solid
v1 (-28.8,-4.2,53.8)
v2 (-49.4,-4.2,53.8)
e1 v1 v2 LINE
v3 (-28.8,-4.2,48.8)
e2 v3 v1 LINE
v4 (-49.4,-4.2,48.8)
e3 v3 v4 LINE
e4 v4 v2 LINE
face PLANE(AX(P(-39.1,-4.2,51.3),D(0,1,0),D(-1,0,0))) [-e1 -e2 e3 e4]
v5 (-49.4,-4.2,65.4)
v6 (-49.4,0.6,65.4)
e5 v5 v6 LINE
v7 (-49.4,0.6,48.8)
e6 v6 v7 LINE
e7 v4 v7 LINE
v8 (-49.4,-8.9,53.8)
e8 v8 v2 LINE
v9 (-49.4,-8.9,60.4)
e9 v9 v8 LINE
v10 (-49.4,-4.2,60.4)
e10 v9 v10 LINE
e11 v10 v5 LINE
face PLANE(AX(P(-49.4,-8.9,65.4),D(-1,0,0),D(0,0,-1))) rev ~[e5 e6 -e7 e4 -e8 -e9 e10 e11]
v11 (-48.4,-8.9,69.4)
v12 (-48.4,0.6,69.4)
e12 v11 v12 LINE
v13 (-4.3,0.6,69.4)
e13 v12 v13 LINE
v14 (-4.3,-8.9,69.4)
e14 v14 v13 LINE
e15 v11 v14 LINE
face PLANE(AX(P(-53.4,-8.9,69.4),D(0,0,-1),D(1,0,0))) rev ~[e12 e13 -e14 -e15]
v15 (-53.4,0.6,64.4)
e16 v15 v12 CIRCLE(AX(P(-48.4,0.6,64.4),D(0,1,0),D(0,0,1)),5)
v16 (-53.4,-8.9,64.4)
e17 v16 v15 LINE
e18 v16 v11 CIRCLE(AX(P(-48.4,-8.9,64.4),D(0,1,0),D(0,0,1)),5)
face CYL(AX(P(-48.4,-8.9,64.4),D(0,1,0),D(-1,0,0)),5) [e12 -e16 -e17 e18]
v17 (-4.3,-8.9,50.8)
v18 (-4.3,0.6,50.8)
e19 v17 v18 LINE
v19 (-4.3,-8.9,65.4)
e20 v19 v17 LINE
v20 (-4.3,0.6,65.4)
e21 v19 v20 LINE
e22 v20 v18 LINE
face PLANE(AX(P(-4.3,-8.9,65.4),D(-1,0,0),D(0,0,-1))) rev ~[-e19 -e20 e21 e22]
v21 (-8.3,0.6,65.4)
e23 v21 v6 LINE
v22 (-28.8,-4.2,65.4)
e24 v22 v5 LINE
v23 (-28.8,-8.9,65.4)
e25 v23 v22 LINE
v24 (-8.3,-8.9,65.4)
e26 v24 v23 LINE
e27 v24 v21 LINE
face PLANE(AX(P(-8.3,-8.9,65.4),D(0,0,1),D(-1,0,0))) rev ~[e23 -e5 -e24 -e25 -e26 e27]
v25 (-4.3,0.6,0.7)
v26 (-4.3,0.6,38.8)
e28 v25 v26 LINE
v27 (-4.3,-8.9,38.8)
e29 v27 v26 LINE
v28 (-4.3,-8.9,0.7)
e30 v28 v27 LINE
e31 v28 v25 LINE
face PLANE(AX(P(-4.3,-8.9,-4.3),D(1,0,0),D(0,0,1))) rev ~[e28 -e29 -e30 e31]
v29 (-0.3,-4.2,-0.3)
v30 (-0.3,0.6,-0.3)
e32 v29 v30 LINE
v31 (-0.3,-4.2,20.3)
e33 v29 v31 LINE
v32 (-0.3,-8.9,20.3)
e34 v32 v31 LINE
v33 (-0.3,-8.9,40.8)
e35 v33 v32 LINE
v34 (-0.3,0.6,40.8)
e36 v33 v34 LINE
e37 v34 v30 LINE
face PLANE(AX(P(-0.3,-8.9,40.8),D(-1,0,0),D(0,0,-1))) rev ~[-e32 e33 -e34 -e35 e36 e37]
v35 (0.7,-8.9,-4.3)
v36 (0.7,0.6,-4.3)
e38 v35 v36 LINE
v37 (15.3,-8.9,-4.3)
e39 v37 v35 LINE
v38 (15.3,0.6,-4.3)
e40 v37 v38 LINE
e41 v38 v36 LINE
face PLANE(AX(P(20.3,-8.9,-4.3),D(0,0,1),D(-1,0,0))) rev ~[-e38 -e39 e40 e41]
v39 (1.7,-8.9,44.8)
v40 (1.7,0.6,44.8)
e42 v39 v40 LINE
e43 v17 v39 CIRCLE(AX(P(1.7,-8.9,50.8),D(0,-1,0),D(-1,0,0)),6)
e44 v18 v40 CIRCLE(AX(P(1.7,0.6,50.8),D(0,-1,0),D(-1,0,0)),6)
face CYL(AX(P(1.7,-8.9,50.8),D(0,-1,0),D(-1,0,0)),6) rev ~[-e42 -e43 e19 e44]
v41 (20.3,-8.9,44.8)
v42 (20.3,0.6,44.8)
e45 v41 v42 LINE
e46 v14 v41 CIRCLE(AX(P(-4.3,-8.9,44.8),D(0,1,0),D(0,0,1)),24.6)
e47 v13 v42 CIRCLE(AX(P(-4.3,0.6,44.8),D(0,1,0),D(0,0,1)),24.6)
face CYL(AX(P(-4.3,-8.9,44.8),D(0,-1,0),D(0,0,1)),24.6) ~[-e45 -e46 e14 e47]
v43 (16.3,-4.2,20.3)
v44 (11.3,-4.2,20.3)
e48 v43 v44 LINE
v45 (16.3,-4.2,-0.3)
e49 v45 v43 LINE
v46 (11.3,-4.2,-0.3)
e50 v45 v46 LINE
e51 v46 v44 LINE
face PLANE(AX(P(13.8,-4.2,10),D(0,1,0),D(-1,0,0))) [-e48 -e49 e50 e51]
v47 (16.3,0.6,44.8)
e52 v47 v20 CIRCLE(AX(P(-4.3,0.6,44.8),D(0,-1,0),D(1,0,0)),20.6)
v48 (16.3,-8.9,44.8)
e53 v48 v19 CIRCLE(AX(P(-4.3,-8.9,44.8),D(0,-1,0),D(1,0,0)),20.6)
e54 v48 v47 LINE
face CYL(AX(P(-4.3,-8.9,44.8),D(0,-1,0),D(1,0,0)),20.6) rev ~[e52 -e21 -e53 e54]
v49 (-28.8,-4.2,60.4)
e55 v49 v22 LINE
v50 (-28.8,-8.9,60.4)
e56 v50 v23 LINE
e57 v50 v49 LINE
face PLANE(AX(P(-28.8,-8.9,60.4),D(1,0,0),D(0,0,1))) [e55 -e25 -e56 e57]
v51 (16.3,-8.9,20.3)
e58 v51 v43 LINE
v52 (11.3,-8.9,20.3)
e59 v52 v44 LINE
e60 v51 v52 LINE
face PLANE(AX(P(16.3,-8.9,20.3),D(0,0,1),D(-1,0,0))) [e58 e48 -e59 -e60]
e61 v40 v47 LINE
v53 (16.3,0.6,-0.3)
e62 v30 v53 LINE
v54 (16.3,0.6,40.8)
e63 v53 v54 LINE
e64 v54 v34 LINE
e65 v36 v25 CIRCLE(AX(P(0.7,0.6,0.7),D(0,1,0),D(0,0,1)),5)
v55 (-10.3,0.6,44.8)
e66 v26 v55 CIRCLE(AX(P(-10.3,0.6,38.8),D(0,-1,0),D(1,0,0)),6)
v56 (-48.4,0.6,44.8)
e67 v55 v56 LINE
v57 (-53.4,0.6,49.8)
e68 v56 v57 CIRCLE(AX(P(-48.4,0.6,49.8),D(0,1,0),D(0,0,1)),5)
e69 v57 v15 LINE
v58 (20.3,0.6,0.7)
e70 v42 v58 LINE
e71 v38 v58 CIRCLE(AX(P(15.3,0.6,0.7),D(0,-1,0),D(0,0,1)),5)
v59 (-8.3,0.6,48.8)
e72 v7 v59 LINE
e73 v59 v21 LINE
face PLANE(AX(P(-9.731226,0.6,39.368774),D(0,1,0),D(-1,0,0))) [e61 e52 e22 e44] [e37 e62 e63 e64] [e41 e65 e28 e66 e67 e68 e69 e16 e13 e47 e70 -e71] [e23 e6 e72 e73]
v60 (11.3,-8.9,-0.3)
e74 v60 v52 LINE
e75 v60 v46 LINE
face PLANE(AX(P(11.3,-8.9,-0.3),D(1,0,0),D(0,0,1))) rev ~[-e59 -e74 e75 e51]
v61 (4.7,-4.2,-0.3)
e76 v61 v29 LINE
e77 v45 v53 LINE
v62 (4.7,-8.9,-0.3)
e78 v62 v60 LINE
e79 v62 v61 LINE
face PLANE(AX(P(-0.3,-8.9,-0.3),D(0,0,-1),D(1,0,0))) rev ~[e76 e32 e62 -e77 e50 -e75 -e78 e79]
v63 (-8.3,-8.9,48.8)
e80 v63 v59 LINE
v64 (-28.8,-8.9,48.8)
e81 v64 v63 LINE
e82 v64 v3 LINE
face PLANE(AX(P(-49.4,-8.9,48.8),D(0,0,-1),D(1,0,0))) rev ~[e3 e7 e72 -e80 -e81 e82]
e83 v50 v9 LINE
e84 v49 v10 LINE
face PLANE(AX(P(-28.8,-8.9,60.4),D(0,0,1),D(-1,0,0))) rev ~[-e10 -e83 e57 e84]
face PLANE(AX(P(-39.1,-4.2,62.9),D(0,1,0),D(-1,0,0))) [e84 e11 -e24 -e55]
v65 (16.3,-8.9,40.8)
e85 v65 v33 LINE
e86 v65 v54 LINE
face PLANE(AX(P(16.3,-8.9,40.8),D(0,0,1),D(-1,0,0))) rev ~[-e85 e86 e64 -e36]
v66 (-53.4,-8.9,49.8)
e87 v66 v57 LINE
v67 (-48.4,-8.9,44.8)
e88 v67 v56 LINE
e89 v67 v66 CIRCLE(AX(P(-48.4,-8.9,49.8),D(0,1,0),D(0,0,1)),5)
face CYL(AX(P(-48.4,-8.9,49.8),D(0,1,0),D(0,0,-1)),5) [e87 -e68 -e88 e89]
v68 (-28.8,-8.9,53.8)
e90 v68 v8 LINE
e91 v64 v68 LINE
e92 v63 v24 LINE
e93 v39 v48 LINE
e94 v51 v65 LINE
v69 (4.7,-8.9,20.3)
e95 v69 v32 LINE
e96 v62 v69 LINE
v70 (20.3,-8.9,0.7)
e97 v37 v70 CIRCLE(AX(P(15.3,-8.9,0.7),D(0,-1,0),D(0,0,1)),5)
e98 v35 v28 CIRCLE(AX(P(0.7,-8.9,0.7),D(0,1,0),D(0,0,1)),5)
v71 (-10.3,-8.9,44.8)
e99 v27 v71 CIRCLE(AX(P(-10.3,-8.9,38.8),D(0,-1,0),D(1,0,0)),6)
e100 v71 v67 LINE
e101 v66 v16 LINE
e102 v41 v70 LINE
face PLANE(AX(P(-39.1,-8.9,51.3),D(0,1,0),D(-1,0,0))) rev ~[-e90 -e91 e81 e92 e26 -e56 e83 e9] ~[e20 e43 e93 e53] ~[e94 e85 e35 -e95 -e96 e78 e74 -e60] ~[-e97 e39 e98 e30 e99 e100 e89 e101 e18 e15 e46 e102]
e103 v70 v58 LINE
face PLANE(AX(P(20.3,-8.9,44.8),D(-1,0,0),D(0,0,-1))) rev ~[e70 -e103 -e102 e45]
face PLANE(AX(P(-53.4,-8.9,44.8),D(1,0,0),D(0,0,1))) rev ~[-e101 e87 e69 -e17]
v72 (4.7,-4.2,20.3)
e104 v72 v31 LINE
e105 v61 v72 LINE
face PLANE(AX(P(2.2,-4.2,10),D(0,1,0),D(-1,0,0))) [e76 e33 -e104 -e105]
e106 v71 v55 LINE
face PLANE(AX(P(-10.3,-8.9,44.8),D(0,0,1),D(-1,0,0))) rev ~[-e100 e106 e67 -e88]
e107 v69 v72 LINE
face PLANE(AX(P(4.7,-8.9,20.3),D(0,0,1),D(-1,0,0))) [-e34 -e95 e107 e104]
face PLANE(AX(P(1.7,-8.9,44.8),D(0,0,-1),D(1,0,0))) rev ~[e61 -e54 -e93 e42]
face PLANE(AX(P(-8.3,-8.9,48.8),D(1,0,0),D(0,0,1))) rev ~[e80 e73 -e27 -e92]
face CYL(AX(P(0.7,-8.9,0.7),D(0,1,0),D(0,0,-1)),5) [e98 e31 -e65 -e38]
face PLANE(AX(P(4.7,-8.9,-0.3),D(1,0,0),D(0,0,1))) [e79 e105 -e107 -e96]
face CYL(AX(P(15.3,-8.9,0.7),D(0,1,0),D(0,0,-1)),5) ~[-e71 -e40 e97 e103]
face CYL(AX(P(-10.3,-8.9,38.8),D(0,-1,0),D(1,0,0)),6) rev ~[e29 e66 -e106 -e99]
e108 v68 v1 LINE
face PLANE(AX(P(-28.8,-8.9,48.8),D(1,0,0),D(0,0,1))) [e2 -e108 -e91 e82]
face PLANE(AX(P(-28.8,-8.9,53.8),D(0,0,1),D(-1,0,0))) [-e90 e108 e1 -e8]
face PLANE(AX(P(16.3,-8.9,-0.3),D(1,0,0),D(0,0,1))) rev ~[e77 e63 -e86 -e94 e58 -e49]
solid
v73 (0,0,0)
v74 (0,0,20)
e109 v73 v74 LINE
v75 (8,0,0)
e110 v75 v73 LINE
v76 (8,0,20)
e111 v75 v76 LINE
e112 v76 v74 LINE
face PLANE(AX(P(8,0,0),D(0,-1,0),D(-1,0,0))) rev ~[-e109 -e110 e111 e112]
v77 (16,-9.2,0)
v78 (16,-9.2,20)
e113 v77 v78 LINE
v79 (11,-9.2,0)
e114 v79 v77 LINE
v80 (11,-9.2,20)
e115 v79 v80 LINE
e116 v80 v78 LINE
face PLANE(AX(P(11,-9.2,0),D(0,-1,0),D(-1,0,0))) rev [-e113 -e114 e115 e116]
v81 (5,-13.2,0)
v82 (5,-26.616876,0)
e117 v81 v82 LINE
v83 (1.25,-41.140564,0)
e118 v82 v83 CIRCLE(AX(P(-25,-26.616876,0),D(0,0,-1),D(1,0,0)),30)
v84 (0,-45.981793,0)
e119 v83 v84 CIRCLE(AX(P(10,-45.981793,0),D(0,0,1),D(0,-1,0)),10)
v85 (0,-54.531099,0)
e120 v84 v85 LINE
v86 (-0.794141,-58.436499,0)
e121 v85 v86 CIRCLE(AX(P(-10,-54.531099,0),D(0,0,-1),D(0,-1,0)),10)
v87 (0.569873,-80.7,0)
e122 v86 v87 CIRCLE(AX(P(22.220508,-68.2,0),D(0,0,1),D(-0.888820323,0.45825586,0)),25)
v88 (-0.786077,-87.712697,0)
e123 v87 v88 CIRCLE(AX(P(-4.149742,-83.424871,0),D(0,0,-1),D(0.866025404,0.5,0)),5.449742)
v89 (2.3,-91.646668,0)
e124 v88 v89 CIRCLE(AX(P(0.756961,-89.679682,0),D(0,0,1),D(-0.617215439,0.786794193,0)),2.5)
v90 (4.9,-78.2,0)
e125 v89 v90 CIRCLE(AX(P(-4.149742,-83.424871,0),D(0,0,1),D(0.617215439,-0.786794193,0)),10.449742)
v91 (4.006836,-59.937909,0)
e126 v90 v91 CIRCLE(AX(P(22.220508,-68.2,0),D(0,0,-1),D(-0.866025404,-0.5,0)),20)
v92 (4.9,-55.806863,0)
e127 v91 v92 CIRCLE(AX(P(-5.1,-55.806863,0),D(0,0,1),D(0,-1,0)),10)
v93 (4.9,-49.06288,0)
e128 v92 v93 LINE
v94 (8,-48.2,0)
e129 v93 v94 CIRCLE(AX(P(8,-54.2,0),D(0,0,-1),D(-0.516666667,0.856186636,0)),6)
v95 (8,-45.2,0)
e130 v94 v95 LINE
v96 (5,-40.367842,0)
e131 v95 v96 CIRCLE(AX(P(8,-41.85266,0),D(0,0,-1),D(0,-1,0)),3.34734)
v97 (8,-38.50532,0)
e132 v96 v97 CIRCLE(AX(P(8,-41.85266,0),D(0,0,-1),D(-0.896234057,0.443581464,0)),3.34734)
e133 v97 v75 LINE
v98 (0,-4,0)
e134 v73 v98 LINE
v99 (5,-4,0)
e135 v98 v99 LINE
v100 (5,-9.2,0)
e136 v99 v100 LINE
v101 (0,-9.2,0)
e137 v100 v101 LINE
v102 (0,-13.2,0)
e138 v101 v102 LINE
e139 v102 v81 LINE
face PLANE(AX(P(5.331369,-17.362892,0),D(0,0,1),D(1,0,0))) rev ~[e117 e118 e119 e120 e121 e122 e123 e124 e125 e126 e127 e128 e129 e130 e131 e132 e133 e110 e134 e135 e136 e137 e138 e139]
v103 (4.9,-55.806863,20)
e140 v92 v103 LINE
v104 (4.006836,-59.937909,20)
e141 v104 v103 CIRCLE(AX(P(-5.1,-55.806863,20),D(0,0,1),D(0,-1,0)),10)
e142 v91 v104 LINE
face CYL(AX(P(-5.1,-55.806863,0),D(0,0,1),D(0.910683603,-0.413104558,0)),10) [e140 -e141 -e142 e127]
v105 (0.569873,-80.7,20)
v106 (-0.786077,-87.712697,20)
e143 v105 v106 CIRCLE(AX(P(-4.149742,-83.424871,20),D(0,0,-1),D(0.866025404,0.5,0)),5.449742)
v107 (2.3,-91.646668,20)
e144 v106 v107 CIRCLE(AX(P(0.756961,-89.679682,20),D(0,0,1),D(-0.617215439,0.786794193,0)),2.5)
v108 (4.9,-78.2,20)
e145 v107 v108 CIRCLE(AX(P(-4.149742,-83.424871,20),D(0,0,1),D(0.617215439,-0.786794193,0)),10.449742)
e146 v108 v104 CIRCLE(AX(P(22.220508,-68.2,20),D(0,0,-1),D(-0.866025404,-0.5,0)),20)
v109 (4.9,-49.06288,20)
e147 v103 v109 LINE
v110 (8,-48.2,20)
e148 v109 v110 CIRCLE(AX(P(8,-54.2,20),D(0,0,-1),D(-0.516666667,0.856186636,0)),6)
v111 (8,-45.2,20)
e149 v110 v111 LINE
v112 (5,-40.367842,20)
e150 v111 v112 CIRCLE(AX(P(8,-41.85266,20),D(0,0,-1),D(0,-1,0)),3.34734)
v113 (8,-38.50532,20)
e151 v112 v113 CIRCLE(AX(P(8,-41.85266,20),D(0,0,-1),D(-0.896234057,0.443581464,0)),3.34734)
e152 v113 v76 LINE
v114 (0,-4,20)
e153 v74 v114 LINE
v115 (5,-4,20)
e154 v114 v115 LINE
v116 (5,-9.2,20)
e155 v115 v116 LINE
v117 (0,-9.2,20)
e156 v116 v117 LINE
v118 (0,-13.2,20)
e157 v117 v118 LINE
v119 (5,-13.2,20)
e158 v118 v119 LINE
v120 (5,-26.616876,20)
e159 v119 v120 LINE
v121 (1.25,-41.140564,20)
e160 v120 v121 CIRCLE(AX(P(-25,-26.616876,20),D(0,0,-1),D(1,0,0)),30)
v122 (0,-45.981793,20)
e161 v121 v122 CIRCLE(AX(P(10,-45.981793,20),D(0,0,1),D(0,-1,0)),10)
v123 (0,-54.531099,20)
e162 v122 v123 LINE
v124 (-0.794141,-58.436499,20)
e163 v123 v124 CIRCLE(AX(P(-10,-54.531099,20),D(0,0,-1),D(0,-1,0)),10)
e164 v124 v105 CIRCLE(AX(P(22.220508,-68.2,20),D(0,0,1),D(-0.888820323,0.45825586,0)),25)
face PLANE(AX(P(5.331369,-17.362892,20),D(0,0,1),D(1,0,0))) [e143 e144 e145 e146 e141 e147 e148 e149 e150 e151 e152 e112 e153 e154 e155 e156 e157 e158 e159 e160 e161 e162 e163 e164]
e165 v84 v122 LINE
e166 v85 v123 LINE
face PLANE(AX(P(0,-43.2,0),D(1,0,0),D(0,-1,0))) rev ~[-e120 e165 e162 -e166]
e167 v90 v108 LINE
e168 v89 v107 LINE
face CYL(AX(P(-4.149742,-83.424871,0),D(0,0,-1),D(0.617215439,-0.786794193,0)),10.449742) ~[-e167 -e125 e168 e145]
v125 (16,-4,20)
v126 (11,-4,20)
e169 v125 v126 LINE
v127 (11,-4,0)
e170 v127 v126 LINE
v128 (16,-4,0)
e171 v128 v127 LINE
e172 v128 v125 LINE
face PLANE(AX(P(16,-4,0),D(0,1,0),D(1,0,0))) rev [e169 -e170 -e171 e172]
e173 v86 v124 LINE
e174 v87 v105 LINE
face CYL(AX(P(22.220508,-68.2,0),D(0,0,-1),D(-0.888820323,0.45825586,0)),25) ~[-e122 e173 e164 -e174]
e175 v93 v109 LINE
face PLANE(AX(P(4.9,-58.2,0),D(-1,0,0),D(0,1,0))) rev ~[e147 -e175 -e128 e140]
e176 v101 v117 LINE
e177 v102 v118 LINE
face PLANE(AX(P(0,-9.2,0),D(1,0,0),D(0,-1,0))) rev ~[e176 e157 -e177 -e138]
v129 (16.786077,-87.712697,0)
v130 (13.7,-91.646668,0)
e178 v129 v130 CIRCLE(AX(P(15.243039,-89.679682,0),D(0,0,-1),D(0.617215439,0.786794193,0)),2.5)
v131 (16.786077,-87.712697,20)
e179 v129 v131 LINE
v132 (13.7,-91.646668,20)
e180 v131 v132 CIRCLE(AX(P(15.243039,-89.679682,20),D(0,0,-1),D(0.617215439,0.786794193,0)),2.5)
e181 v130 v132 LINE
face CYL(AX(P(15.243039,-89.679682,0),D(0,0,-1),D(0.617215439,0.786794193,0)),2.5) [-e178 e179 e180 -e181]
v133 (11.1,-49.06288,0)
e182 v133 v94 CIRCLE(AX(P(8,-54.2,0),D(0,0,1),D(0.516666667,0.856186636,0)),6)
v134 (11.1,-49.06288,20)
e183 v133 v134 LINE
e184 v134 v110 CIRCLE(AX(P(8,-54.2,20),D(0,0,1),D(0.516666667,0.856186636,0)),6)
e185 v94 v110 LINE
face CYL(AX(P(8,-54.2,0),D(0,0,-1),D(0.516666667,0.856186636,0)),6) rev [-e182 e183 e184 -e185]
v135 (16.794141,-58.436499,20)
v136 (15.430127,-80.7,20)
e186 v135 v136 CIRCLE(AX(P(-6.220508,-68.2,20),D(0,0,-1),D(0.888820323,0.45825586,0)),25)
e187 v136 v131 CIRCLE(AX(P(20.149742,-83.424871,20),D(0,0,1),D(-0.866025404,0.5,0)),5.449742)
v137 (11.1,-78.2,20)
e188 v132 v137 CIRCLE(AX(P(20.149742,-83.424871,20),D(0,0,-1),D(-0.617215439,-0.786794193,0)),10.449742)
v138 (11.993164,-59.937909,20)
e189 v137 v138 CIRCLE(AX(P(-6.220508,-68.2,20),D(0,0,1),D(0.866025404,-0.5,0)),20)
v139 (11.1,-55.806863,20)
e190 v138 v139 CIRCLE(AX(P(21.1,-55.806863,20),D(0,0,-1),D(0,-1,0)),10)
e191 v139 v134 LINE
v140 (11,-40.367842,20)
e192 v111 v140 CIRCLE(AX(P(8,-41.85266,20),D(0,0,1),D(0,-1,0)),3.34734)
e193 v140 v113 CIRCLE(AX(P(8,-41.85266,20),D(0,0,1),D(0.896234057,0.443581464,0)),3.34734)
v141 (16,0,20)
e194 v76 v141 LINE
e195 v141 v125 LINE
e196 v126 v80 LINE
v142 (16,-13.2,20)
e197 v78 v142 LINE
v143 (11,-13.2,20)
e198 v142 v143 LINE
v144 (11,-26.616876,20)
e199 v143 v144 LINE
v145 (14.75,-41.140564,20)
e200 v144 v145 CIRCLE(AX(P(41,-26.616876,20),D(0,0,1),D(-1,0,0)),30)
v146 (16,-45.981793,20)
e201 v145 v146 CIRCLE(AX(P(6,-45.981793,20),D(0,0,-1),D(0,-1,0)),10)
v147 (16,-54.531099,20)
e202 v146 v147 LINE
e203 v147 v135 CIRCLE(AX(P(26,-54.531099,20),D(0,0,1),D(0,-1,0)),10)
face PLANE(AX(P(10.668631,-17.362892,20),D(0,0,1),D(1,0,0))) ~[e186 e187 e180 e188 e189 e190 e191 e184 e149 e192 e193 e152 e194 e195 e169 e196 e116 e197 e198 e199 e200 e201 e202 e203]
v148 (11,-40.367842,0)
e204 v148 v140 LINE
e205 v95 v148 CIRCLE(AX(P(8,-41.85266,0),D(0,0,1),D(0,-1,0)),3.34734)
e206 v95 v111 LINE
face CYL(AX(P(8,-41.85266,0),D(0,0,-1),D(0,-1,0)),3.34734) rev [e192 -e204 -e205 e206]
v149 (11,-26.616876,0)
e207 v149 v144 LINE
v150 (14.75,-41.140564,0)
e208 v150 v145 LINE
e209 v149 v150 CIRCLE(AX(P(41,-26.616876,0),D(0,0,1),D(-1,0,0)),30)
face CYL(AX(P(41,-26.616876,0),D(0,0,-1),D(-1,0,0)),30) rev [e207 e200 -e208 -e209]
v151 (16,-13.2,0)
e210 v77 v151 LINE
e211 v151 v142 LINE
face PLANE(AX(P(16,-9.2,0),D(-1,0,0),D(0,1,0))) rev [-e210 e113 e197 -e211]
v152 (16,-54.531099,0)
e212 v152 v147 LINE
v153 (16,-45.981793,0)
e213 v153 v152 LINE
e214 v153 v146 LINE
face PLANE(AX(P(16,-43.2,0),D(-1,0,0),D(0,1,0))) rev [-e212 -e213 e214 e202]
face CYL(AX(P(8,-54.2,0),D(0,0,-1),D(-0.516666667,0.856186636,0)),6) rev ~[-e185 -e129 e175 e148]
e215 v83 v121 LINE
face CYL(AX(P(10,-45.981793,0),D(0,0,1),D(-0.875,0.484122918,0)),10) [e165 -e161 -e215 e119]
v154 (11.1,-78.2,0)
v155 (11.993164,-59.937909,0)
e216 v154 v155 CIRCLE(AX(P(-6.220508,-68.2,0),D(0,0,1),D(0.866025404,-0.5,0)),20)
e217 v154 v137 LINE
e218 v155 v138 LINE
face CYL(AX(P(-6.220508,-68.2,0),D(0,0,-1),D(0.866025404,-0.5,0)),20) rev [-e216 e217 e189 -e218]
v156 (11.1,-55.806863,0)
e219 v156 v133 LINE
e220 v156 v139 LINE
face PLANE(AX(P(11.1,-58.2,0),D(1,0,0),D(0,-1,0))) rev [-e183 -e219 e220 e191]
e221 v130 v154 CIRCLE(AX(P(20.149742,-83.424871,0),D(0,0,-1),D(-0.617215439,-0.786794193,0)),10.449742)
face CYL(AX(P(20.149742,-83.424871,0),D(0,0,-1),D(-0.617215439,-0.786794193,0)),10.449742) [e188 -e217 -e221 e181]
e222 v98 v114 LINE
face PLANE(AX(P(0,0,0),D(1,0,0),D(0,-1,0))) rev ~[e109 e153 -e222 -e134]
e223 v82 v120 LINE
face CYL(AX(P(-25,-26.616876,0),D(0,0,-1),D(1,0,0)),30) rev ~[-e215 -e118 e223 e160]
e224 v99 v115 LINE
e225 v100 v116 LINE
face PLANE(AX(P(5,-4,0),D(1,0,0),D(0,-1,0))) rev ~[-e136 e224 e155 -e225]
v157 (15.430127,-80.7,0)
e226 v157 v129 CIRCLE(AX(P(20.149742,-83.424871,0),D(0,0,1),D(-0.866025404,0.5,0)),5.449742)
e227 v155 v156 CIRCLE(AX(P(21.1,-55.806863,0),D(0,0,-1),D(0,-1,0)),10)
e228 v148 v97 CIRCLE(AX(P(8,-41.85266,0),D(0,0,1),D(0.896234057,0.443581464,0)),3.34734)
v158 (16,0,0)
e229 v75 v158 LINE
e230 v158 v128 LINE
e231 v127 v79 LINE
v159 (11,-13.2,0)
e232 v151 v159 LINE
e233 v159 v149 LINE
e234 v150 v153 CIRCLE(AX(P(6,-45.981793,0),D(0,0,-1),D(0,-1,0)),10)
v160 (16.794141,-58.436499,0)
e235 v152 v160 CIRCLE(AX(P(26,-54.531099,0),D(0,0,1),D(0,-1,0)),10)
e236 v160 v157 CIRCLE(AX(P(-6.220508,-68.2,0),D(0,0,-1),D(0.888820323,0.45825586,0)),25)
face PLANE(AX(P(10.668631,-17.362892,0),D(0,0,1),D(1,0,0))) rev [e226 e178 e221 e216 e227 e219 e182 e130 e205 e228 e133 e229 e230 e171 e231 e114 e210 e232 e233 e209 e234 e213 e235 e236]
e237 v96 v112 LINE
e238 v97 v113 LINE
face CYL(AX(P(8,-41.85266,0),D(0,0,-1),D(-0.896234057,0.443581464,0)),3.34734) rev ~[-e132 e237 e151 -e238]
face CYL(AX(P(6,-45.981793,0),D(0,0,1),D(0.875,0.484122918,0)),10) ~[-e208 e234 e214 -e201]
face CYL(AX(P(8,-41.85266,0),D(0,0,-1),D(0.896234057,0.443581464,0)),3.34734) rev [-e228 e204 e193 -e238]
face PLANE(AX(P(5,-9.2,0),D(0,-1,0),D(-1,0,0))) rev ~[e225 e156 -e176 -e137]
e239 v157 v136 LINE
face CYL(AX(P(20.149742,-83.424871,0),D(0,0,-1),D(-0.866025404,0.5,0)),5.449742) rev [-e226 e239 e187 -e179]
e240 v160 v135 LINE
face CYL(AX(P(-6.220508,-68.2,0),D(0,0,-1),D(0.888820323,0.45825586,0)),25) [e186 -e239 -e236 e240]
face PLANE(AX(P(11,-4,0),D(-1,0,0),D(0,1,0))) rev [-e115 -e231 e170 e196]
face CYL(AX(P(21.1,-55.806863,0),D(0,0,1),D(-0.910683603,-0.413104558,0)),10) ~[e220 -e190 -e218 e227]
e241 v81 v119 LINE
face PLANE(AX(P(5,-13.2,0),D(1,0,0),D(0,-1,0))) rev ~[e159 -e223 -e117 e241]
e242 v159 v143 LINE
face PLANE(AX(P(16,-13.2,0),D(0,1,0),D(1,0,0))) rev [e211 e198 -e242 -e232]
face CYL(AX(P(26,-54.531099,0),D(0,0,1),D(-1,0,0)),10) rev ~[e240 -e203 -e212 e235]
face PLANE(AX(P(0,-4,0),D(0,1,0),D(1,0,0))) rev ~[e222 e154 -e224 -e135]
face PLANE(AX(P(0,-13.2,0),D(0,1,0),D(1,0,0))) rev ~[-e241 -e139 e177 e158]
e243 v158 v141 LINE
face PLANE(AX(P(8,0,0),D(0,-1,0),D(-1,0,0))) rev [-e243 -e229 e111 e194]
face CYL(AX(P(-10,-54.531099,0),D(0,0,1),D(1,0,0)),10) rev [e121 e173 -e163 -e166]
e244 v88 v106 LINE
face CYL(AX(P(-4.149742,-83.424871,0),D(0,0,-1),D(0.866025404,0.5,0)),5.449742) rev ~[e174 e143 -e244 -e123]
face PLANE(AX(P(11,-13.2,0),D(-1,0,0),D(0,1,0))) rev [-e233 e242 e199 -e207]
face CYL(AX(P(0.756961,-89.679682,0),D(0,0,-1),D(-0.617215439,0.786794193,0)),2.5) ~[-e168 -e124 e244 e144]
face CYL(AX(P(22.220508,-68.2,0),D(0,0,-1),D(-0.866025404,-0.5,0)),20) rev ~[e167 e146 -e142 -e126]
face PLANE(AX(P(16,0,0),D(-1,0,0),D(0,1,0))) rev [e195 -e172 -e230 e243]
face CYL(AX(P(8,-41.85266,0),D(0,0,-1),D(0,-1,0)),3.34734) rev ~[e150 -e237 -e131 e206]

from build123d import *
from build123d import SkipClean  # not in build123d's __all__

# Parameters (mm, degrees)
F1_DEPTH = 20
F2_R     = 10
F6_DEPTH = 9.5
F5_W     = 20.6
F5_H     = 5
F5_W_2   = 5
F5_H_2   = 20.6
F7_DEPTH = 4.7
F8_R     = 5


with BuildPart() as f1:
    # F0 (on Top) → F1 (new body)
    with BuildSketch(Plane.XY):
        with BuildLine():
            Line((8, 0), (0, 0))
            Line((0, 0), (0, -4))
            Line((0, -4), (5, -4))
            Line((5, -4), (5, -9.2))
            Line((5, -9.2), (0, -9.2))
            Line((0, -9.2), (0, -13.2))
            Line((0, -13.2), (5, -13.2))
            Line((5, -13.2), (5, -26.6168760482))
            Line((5, -26.6168760482), (5, -40.3678421966))
            ThreePointArc((5, -40.3678421966), (6.234427286, -39.0088181315), (8, -38.5053202414))
            Line((8, -38.5053202414), (8, 0))
        make_face()
        with BuildLine():
            Line((8, -48.2), (8, -45.2))
            ThreePointArc((8, -45.2), (5.1561580109, -43.6182328347), (5, -40.3678421966))
            Line((5, -40.3678421966), (5, -26.6168760482))
            ThreePointArc((5, -26.6168760482), (3.7228132327, -35.2771300861), (0, -43.2))
            Line((0, -43.2), (0, -56.7436034959))
            ThreePointArc((0, -56.7436034959), (-2.7724216072, -68.7945299554), (0.5698729811, -80.7))
            ThreePointArc((0.5698729811, -80.7), (1.2008963786, -84.4594516542), (-0.7860771969, -87.7126966924))
            ThreePointArc((-0.7860771969, -87.7126966924), (-1.2100240798, -91.2227207722), (2.3, -91.6466676551))
            ThreePointArc((2.3, -91.6466676551), (6.109971325, -85.4086529871), (4.9, -78.2))
            ThreePointArc((4.9, -78.2), (2.2205080757, -68.2), (4.9, -58.2))
            Line((4.9, -58.2), (4.9, -49.0628801844))
            ThreePointArc((4.9, -49.0628801844), (6.3910747211, -48.4197439982), (8, -48.2))
        make_face()
    extrude(amount=F1_DEPTH)

    # F2
    f2_edges = [f1.edges().sort_by_distance(p)[0] for p in [
        (4.9, -58.2, 10),
        (0, -56.743603, 10),
        (0, -43.2, 10),
    ]]
    fillet(f2_edges, radius=F2_R)

    # F3: F1 across face


with BuildPart() as f1_1:
    add(f1.part, clean=False)
    with SkipClean():  # cleaning this boolean's faces spoils the solid; the shape is the same uncleaned
        add(f1.part.mirror(Plane(origin=(8, -19.2526601207, 10), x_dir=(0, 1, 0), z_dir=(1, 0, 0))), clean=False)


with BuildPart() as f6:
    # F5 (on offset) → F6 (new body)
    with BuildSketch(Plane(origin=(0, -8.9, 0), x_dir=(-1, 0, 0), z_dir=(0, 1, 0))):
        with BuildLine():
            Line((-20.3, -4.3), (4.3, -4.3))
            Line((4.3, -4.3), (4.3, 38.8))
            ThreePointArc((4.3, 38.8), (6.0573593129, 43.0426406871), (10.3, 44.8))
            Line((10.3, 44.8), (53.4, 44.8))
            Line((53.4, 44.8), (53.4, 69.4))
            Line((53.4, 69.4), (4.3, 69.4))
            ThreePointArc((4.3, 69.4), (-13.0948268172, 62.1948268172), (-20.3, 44.8))
            Line((-20.3, 44.8), (-20.3, -4.3))
        make_face()
        Polygon((0.3, -0.3), (-4.7, -0.3), (-11.3, -0.3), (-16.3, -0.3), (-16.3, 20.3), (-16.3, 40.8), (0.3, 40.8), (0.3, 20.3), align=None, mode=Mode.SUBTRACT)
        with BuildLine():
            ThreePointArc((4.3, 50.8), (2.5426406871, 46.5573593129), (-1.7, 44.8))
            Line((-1.7, 44.8), (-16.3, 44.8))
            ThreePointArc((-16.3, 44.8), (-10.2663996924, 59.3663996924), (4.3, 65.4))
            Line((4.3, 65.4), (4.3, 50.8))
        make_face(mode=Mode.SUBTRACT)
        Polygon((8.3, 65.4), (28.8, 65.4), (49.4, 65.4), (49.4, 60.4), (49.4, 53.8), (49.4, 48.8), (28.8, 48.8), (8.3, 48.8), align=None, mode=Mode.SUBTRACT)
    extrude(amount=F6_DEPTH)

    # F5 (on offset) → F7 (join)
    with BuildSketch(Plane(origin=(0, -8.9, 0), x_dir=(-1, 0, 0), z_dir=(0, 1, 0))):
        with Locations((39.1, 51.3)):
            Rectangle(F5_W, F5_H)
        with Locations((39.1, 62.9)):
            Rectangle(F5_W, F5_H)
        with Locations((-13.8, 10)):
            Rectangle(F5_W_2, F5_H_2)
        with Locations((-2.2, 10)):
            Rectangle(F5_W_2, F5_H_2)
    extrude(amount=F7_DEPTH)

    # F8
    f8_edges = [f6.edges().sort_by_distance(p)[0] for p in [
        (-53.4, -4.15, 44.8),
        (-53.4, -4.15, 69.4),
        (20.3, -4.15, -4.3),
        (-4.3, -4.15, -4.3),
    ]]
    fillet(f8_edges, radius=F8_R)


solid = Compound([f1_1.part, f6.part])
